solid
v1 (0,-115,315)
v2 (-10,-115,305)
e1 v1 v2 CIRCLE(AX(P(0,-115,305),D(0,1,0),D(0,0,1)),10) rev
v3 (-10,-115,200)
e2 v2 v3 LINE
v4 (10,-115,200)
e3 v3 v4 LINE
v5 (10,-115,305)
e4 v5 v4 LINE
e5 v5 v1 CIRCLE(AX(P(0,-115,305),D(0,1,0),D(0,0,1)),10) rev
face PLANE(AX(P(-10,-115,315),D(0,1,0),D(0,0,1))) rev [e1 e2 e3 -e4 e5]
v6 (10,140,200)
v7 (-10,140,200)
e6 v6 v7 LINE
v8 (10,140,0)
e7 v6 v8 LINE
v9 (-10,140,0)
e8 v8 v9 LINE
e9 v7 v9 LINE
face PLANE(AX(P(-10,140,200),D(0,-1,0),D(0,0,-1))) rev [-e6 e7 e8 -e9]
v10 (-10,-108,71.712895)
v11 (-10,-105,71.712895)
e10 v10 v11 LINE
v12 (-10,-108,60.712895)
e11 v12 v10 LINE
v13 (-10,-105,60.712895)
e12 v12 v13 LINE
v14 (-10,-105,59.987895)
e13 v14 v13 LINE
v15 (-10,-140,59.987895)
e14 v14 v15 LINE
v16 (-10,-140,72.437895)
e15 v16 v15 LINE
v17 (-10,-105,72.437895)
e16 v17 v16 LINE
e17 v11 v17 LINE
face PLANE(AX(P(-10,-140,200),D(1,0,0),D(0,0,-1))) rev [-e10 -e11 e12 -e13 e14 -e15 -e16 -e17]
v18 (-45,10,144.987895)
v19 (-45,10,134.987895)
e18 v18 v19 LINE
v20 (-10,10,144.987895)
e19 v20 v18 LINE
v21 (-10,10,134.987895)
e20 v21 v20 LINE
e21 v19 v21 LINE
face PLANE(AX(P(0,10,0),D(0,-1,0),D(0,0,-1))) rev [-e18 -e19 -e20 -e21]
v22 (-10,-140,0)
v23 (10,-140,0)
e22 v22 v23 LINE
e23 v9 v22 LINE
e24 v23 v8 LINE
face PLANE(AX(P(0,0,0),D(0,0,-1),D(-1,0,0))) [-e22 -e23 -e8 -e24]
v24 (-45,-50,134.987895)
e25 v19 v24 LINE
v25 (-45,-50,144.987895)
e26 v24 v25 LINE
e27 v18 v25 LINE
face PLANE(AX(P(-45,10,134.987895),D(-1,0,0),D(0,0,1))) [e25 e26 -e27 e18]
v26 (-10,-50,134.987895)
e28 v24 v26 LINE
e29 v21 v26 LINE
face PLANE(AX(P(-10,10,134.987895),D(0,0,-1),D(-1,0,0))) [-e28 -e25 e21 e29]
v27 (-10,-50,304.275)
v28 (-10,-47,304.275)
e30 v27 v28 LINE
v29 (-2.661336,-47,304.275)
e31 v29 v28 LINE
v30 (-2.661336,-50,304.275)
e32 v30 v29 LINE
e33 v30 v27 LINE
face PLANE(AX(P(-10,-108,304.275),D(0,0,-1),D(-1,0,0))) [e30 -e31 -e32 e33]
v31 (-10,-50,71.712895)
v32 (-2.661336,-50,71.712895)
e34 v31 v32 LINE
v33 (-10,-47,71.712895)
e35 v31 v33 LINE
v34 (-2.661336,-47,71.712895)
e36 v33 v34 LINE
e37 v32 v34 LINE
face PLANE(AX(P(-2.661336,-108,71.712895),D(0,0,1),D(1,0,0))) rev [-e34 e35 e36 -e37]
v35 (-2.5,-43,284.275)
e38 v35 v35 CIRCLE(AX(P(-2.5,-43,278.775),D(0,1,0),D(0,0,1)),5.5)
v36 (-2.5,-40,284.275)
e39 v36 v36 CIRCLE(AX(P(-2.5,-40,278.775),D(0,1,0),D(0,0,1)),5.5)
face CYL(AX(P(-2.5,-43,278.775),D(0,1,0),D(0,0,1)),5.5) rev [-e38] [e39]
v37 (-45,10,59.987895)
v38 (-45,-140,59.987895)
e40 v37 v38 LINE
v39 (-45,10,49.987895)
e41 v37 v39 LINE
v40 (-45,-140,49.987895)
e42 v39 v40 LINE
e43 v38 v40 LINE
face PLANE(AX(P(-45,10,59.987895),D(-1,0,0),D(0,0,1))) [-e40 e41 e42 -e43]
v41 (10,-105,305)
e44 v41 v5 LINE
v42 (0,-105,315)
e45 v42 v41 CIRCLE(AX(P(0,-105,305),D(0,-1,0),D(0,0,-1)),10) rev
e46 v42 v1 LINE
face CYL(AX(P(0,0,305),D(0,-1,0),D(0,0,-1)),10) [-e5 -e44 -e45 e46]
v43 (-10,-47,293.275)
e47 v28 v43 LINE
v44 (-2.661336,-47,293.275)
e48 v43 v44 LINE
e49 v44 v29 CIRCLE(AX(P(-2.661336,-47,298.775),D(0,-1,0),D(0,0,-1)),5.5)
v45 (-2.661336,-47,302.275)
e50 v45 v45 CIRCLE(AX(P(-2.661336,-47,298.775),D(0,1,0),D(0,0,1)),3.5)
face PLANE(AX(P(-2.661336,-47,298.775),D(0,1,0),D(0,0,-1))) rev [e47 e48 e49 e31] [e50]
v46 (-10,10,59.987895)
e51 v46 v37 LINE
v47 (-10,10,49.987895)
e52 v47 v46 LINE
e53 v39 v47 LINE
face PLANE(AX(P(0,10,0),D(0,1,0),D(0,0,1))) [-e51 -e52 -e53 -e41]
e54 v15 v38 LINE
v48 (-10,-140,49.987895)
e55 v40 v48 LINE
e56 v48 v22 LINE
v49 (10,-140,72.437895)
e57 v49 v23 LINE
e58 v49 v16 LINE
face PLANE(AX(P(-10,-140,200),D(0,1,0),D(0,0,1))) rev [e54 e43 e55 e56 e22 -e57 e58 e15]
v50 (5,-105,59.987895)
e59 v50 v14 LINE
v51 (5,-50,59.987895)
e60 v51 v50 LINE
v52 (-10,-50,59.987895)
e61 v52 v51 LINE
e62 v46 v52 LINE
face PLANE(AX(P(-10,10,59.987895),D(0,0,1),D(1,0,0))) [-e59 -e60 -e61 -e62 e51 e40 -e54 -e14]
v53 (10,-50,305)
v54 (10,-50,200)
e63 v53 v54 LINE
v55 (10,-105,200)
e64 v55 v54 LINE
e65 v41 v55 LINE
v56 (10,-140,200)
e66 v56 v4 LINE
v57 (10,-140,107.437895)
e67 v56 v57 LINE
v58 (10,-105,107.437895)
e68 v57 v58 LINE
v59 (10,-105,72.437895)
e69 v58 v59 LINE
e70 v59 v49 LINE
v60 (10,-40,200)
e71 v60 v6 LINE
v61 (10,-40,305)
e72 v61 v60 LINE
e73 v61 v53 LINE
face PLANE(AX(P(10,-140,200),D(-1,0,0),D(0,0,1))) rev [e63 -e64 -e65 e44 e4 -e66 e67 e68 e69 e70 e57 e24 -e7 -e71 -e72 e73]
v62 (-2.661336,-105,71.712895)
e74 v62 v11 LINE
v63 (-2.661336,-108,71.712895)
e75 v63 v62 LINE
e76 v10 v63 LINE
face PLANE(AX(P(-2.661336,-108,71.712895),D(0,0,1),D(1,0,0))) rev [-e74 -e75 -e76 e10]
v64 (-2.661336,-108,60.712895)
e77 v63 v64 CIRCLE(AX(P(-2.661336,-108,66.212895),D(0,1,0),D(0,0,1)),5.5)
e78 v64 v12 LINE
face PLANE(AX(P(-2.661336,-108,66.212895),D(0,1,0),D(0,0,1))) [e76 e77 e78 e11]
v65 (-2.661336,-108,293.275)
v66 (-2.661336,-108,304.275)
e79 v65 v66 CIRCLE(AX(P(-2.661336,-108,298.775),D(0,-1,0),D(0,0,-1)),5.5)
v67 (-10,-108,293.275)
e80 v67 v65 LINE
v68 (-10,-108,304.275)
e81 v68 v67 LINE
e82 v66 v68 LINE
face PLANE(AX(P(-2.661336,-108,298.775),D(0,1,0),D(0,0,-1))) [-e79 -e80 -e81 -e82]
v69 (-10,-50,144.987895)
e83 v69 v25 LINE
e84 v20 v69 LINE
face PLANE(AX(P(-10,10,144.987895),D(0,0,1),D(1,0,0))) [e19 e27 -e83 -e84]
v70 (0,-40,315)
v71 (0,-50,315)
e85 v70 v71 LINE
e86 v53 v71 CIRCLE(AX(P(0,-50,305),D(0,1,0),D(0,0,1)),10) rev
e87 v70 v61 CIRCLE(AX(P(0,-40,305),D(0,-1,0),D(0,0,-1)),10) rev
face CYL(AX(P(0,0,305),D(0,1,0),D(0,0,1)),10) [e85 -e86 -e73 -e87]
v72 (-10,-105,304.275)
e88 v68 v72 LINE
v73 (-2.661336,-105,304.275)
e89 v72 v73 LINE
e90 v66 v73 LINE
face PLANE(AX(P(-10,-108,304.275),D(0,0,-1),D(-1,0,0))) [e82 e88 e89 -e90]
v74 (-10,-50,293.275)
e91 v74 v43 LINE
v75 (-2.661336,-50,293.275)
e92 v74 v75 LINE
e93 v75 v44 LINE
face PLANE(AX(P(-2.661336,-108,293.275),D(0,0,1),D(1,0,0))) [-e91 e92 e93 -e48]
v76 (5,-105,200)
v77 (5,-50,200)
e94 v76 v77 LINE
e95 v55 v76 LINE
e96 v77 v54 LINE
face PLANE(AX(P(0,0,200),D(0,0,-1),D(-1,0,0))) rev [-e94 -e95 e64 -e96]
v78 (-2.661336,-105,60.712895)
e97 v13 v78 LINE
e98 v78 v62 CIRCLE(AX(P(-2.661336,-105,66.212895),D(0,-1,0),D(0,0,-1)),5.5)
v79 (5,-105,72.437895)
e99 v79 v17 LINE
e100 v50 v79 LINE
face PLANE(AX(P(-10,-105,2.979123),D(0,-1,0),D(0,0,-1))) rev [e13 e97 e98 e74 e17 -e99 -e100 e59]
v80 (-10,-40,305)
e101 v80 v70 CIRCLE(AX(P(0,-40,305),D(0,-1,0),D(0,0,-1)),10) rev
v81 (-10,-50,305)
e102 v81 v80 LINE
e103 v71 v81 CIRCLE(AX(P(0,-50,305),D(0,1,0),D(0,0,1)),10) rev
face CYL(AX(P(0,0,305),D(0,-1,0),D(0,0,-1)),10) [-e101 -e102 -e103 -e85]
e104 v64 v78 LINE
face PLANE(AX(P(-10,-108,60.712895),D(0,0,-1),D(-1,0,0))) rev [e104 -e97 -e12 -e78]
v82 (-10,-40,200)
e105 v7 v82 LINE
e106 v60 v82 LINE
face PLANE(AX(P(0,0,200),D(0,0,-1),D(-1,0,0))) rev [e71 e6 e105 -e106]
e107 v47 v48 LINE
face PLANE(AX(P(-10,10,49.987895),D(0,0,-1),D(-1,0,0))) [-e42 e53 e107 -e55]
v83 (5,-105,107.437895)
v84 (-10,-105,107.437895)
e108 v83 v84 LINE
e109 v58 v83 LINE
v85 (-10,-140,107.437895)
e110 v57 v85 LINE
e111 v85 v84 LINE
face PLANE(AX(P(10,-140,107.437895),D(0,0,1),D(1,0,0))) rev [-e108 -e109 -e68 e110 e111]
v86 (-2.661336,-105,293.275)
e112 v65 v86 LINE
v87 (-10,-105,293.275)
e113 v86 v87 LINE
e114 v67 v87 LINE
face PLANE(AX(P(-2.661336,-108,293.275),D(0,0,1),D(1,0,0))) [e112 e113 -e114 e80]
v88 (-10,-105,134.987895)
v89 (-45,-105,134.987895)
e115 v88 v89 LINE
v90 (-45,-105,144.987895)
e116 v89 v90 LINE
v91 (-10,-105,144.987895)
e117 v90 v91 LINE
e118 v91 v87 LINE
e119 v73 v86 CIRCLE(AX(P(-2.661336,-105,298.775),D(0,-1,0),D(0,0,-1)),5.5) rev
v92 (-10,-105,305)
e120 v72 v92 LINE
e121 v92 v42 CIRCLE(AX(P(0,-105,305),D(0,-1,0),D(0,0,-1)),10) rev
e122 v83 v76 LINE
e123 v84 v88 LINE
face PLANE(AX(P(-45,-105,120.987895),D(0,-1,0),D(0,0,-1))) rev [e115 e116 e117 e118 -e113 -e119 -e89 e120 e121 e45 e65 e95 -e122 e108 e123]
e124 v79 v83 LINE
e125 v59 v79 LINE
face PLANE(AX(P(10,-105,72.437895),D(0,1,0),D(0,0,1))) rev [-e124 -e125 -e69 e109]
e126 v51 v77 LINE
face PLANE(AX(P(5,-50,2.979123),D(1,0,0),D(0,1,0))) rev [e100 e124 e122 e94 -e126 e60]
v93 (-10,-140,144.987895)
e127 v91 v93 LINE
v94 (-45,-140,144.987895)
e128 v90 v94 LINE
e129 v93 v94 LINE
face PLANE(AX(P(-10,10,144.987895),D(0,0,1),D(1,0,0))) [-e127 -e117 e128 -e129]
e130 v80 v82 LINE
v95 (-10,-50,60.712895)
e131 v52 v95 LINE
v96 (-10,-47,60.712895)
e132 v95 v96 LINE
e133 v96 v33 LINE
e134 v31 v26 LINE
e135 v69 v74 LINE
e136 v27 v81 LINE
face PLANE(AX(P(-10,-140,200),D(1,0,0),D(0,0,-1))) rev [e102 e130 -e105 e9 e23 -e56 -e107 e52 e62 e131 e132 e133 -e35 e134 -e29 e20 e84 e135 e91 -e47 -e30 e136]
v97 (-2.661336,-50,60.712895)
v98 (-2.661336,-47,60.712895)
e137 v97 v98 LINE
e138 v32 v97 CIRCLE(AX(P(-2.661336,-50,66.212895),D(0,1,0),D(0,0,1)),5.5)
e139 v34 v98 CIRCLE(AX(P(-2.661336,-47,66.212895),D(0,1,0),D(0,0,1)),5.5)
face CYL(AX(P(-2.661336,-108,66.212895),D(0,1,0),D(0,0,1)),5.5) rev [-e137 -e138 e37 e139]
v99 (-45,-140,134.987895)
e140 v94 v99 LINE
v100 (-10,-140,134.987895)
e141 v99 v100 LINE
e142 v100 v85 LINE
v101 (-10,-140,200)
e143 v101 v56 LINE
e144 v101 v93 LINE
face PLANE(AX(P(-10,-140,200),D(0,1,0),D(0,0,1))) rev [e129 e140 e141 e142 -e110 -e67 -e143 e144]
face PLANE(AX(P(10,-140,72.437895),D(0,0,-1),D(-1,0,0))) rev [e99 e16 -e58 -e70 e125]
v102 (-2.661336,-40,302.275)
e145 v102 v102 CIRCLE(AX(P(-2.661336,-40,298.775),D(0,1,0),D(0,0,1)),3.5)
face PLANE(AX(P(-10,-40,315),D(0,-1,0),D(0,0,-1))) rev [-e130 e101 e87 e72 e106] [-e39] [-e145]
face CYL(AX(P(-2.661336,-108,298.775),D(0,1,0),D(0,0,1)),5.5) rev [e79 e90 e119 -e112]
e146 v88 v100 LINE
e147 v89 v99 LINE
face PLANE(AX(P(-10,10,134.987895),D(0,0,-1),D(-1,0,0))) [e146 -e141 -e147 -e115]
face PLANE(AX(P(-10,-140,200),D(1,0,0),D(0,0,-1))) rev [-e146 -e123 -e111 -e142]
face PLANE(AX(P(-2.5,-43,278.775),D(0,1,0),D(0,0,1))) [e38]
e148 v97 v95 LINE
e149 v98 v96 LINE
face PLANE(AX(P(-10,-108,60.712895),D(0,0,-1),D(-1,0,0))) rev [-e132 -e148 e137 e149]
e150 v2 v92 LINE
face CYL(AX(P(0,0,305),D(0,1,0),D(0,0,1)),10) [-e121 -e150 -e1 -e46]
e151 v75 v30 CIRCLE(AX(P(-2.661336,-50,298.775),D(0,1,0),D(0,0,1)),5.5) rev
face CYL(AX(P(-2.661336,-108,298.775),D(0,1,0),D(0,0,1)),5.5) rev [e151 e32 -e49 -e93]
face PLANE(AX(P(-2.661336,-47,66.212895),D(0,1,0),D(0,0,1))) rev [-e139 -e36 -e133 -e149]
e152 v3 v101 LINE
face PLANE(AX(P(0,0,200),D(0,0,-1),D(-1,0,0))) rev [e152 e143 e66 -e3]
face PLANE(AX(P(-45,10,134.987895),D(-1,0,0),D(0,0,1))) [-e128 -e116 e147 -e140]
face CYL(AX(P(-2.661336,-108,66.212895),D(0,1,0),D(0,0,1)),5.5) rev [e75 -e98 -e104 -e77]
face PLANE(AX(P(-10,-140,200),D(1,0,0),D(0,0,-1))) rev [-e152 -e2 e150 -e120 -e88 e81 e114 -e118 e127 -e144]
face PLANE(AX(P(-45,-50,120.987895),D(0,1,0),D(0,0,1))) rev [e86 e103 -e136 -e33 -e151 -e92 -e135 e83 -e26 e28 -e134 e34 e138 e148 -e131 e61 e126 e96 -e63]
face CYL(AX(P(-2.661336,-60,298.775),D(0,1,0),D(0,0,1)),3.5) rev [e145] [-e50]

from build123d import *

# Parameters (mm, degrees)
SKETCH_1_W          = 20
SKETCH_1_H          = 280
EXTRUDE_1_DEPTH     = 200
SKETCH_2_W          = 35
SKETCH_2_H          = 35
CUT_EXTRUDE_1_DEPTH = 245.948974278
SKETCH_4_W          = 35
SKETCH_4_H          = 10
EXTRUDE_2_DEPTH     = 150
SKETCH_5_W          = 35
SKETCH_5_H          = 55
CUT_EXTRUDE_3_DEPTH = 24
CUT_EXTRUDE_4_REACH = 250.244
SKETCH_6_W          = 15
SKETCH_6_H          = 55
CUT_EXTRUDE_START   = -3
CUT_EXTRUDE_5_DEPTH = 61
SKETCH_9_W          = 20
SKETCH_9_H          = 10
EXTRUDE_3_DEPTH     = 115
SKETCH_10_R         = 3.5
CUT_EXTRUDE_7_DEPTH = 20
SKETCH_11_R         = 5.5
CUT_EXTRUDE_8_DEPTH = 3
FILLET_1_R          = 10


with BuildPart() as part:
    # 草图1 → 凸台-拉伸1 (new body)
    with BuildSketch(Plane.XY):
        Rectangle(SKETCH_1_W, SKETCH_1_H)
    extrude(amount=EXTRUDE_1_DEPTH)

    # 草图2 → 切除-拉伸1 (cut, through all)
    with BuildSketch(Plane.ZY.offset(10)):
        with Locations((89.937894672, -122.5)):
            Rectangle(SKETCH_2_W, SKETCH_2_H)
    extrude(amount=-CUT_EXTRUDE_1_DEPTH, mode=Mode.SUBTRACT)

    # 草图4 → 凸台-拉伸2 (add)
    with BuildSketch(Plane.XZ.offset(140)):
        with Locations((-27.5, 54.987894672)):
            Rectangle(SKETCH_4_W, SKETCH_4_H)
        with Locations((-27.5, 139.987894672)):
            Rectangle(SKETCH_4_W, SKETCH_4_H)
    extrude(amount=-EXTRUDE_2_DEPTH)

    # 草图5 → 切除-拉伸3 (cut)
    with BuildSketch(Plane.XY.offset(144.987894672)):
        with Locations((-27.5, -77.5)):
            Rectangle(SKETCH_5_W, SKETCH_5_H)
    extrude(amount=-CUT_EXTRUDE_3_DEPTH, mode=Mode.SUBTRACT)

    # 切除-拉伸4: up to this face of the body (flat: up to its plane)
    cut_extrude_4_end = Plane(part.part.faces().sort_by_distance((-27.5, -65, 59.987894672))[0])
    # 草图6 → 切除-拉伸4 (cut, up to the picked face)
    with BuildSketch(Plane.XY.offset(200), mode=Mode.PRIVATE) as cut_extrude_4_sk1:
        with Locations((-2.5, -77.5)):
            Rectangle(SKETCH_6_W, SKETCH_6_H)
    cut_extrude_4_tool1 = split(extrude(cut_extrude_4_sk1.sketch, amount=-CUT_EXTRUDE_4_REACH, mode=Mode.PRIVATE), bisect_by=cut_extrude_4_end, keep=Keep.BOTH, mode=Mode.PRIVATE)
    add(cut_extrude_4_tool1.solids().sort_by(Axis((-2.5, -77.5, 200), (0, 0, -1)))[0], mode=Mode.SUBTRACT)

    # 草图7 → 切除-拉伸5 (cut)
    with BuildSketch(Plane(origin=(0, -105, 0), x_dir=(1, 0, 0), z_dir=(0, 1, 0)).offset(CUT_EXTRUDE_START)):
        with BuildLine():
            Line((-2.661336035, -71.712894672), (-10, -71.712894672))
            Line((-10, -71.712894672), (-10, -60.712894672))
            Line((-10, -60.712894672), (-2.661336035, -60.712894672))
            ThreePointArc((-2.661336035, -60.712894672), (2.838663965, -66.212894672), (-2.661336035, -71.712894672))
        make_face()
    cut_extrude_5 = extrude(amount=CUT_EXTRUDE_5_DEPTH, mode=Mode.SUBTRACT)

    # 草图9 → 凸台-拉伸3 (add)
    with BuildSketch(Plane.XY.offset(200)):
        with Locations((0, -110)):
            Rectangle(SKETCH_9_W, SKETCH_9_H)
        with Locations((0, -45)):
            Rectangle(SKETCH_9_W, SKETCH_9_H)
    extrude(amount=EXTRUDE_3_DEPTH)

    # 镜向1: 切除-拉伸5 across plane
    add(cut_extrude_5.mirror(Plane(origin=(0, 0, 182.493947336), x_dir=(1, 0, 0), z_dir=(0, 0, -1))), mode=Mode.SUBTRACT)

    # 草图10 → 切除-拉伸7 (cut)
    with BuildSketch(Plane(origin=(0, -40, 0), x_dir=(1, 0, 0), z_dir=(0, 1, 0))):
        with Locations(Location((-2.661336035, -298.775, 0), (0, 0, 270))):
            Circle(SKETCH_10_R)
    extrude(amount=-CUT_EXTRUDE_7_DEPTH, mode=Mode.SUBTRACT)

    # 草图11 → 切除-拉伸8 (cut)
    with BuildSketch(Plane(origin=(0, -40, 0), x_dir=(1, 0, 0), z_dir=(0, 1, 0))):
        with Locations(Location((-2.5, -278.775, 0), (0, 0, 270))):
            Circle(SKETCH_11_R)
    extrude(amount=-CUT_EXTRUDE_8_DEPTH, mode=Mode.SUBTRACT)

    # 圆角1
    fillet_1_edges = [part.edges().sort_by_distance(p)[0] for p in [
        (10, -45, 315),
        (10, -110, 315),
        (-10, -45, 315),
        (-10, -110, 315),
    ]]
    fillet(fillet_1_edges, radius=FILLET_1_R - 0.0001)  # a hair under: the kernel refuses the full size


solid = part.part
